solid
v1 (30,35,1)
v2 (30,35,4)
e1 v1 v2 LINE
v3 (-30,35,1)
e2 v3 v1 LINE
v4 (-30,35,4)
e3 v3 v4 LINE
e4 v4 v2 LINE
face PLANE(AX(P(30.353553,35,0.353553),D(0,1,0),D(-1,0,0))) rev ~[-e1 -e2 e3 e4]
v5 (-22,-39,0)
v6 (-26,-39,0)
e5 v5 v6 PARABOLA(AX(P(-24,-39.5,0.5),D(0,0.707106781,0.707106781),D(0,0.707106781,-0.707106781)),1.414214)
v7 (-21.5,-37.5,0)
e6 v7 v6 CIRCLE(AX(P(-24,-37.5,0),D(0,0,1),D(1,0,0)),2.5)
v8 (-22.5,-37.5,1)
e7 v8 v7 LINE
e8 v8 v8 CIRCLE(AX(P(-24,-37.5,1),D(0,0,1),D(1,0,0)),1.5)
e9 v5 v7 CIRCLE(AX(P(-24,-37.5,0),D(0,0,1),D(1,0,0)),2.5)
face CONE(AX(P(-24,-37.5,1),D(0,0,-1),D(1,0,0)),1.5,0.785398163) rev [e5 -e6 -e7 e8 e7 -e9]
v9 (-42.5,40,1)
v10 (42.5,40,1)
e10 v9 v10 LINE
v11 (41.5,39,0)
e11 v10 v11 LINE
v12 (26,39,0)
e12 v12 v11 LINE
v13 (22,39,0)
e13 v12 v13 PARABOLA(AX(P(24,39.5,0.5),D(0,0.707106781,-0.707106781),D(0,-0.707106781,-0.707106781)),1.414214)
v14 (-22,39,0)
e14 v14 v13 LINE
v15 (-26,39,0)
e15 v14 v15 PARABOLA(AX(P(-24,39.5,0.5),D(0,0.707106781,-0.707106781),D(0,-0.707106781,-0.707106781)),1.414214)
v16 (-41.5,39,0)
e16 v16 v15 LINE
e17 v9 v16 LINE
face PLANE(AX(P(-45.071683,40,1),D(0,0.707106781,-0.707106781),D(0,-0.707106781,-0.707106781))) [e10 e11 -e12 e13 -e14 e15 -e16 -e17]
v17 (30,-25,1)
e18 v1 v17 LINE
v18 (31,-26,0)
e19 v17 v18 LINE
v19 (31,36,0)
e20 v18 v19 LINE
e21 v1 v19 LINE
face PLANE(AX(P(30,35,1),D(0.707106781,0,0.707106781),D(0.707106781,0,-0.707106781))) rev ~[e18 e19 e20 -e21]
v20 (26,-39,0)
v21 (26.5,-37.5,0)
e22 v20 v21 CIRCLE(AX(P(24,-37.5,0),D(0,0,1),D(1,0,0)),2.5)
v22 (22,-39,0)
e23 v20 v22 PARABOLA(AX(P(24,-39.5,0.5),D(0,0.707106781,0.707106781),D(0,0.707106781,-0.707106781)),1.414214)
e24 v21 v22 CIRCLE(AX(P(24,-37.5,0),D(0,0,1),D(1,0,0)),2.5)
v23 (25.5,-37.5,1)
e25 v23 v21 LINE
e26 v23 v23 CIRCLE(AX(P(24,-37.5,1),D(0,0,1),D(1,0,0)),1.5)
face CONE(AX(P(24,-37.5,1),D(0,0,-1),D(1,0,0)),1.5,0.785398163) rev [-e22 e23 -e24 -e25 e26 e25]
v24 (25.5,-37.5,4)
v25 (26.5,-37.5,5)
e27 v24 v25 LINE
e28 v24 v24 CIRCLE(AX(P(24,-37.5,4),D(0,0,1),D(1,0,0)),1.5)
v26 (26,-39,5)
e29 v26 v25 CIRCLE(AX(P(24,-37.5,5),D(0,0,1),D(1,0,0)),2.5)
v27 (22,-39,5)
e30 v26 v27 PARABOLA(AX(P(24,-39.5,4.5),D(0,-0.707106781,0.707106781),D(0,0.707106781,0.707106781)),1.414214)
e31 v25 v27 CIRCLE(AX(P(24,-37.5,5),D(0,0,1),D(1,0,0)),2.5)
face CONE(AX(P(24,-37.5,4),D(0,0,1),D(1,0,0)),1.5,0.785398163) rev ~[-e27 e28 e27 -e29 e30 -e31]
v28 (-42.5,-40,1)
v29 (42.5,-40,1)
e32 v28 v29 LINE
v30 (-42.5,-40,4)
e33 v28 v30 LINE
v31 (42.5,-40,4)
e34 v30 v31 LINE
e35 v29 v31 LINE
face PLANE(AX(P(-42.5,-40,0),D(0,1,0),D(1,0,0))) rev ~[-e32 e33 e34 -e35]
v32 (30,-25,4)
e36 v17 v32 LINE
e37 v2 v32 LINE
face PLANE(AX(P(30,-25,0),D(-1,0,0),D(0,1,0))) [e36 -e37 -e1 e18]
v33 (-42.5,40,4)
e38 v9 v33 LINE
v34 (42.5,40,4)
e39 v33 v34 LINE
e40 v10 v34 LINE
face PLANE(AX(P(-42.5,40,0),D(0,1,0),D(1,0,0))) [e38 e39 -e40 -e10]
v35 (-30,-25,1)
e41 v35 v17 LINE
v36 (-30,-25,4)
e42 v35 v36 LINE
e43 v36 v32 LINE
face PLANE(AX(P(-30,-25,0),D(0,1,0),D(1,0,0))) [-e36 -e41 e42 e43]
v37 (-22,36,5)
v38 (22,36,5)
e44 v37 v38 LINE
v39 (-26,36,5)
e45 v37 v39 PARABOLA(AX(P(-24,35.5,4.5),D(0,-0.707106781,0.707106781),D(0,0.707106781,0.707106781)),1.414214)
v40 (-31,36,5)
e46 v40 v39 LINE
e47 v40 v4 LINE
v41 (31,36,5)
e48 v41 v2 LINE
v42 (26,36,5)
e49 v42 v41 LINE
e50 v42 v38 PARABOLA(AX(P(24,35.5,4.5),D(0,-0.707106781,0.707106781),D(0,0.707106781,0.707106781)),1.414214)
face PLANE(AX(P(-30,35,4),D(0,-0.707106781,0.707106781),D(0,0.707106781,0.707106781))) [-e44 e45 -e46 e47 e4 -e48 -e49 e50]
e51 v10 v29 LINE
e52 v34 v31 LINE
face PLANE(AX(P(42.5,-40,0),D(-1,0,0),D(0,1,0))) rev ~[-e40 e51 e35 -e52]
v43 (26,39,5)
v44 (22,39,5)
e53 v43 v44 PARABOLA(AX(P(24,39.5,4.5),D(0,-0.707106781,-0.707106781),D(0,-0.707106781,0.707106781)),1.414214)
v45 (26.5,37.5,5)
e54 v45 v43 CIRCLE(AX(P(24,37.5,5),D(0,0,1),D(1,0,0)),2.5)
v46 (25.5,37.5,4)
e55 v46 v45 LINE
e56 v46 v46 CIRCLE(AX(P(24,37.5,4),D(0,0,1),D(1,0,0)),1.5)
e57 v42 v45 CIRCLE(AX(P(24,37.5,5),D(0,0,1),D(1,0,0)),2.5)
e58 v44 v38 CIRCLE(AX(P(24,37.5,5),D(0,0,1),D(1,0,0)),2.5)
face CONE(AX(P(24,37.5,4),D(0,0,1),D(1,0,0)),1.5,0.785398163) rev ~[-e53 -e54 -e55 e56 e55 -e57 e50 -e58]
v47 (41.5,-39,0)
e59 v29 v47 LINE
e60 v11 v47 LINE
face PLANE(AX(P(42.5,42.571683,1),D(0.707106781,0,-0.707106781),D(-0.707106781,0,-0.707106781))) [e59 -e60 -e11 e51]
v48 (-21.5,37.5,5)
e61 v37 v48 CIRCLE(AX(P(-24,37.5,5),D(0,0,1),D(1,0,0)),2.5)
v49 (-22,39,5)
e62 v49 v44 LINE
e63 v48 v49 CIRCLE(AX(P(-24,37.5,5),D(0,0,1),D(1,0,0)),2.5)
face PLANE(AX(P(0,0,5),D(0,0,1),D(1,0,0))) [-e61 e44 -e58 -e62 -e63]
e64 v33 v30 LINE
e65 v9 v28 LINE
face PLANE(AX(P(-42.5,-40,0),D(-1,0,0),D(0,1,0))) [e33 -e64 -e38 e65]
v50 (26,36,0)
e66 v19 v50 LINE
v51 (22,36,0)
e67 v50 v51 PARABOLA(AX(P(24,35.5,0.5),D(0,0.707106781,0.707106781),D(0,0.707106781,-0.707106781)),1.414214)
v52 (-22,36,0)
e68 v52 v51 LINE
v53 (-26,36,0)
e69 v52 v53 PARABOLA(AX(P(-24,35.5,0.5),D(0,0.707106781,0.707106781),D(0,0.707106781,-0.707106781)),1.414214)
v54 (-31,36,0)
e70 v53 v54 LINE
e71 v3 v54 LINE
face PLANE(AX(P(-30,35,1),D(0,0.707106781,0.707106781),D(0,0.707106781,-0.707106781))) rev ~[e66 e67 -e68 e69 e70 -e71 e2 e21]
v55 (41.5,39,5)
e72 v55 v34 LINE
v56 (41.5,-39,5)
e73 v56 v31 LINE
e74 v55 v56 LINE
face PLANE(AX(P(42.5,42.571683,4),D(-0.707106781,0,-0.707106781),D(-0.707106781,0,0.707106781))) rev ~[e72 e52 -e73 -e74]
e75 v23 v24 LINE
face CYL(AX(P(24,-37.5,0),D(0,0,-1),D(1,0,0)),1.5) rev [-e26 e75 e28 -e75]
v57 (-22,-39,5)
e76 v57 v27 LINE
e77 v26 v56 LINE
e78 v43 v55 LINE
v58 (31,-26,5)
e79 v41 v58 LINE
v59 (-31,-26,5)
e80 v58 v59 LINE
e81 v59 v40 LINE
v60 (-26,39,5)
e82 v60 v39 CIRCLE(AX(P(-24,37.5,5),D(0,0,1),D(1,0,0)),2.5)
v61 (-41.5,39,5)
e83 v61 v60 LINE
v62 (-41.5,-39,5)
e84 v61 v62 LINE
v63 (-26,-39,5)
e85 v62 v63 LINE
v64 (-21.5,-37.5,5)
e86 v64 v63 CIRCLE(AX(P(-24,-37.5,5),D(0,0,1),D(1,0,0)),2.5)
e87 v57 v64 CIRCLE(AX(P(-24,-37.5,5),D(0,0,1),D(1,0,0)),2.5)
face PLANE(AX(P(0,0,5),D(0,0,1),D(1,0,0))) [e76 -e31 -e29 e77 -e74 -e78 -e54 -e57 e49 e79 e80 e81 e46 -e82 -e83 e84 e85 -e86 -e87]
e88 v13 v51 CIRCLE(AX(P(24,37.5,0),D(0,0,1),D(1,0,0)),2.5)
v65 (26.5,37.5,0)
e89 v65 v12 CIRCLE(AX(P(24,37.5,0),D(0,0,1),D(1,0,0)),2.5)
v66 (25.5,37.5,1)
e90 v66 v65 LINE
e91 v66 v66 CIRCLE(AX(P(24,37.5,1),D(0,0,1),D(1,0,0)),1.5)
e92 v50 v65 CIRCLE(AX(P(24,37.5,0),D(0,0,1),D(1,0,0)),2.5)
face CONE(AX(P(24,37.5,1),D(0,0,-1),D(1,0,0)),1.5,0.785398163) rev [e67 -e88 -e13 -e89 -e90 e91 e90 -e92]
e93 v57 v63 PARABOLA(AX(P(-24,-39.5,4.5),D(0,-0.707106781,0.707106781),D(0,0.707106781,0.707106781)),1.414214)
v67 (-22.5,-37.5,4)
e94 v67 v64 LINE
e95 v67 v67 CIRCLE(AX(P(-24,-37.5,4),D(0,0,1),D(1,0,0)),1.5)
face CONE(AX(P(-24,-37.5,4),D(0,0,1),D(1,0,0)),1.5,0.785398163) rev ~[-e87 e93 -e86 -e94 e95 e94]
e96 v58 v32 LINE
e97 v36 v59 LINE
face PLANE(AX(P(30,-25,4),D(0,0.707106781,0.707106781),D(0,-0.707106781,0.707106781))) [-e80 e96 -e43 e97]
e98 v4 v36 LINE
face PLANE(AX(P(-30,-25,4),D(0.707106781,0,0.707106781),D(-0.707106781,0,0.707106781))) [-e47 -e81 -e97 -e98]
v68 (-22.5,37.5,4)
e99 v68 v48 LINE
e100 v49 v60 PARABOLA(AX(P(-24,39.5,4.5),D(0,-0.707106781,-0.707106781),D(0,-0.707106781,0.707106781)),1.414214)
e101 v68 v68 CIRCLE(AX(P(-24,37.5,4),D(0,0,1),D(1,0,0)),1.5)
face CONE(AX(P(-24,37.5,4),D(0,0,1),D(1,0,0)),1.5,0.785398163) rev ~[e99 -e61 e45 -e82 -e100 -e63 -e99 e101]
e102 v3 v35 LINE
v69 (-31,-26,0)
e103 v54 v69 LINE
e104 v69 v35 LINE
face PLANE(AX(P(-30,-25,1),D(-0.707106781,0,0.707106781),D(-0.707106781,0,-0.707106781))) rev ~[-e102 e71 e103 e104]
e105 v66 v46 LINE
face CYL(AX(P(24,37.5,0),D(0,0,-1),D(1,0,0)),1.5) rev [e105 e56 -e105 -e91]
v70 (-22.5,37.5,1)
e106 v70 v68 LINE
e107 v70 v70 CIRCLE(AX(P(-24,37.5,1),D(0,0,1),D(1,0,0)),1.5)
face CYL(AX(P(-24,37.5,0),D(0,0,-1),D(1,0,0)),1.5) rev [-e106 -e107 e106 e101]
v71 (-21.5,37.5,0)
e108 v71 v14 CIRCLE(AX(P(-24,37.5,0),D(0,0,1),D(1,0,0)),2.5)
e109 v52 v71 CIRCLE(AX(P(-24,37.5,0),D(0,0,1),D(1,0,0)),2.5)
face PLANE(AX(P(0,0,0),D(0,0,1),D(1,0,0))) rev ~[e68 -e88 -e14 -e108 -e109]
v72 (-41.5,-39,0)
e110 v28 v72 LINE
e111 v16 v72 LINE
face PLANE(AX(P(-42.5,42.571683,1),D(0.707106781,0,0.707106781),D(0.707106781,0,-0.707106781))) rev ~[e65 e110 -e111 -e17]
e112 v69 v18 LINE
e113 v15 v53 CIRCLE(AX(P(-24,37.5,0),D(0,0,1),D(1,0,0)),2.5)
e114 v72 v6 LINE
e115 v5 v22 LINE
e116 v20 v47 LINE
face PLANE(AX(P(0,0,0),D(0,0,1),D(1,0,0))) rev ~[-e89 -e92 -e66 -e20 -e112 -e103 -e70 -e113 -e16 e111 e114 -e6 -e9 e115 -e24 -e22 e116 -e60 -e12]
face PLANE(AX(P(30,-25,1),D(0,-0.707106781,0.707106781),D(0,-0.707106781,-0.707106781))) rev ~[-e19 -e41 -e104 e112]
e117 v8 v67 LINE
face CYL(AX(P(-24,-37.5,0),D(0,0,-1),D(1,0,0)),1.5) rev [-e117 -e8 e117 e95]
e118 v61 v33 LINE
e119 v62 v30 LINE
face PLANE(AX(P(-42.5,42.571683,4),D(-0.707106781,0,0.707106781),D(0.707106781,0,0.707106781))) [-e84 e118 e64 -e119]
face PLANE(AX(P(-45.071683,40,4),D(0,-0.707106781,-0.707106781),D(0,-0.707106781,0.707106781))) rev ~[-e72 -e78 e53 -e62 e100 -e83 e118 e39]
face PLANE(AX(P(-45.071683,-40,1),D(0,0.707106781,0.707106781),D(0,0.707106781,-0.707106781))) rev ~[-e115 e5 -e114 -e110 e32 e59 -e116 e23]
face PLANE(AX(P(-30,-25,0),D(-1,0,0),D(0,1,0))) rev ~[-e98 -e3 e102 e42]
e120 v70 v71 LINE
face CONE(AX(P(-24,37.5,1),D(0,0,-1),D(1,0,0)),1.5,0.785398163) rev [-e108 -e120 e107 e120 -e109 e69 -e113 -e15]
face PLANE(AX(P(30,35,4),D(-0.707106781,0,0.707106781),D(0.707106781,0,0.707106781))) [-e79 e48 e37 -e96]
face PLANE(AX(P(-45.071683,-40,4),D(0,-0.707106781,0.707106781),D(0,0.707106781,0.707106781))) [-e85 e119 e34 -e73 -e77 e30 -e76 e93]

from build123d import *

# Parameters (mm, degrees)
F0_W          = 85
F0_H          = 80
F0_R          = 1.5
F0_W_2        = 60
F0_H_2        = 60
F1_DEPTH      = 5
F2_T1_DEPTH   = 90.1433659759
F2_T3_DEPTH   = 85.1433659759
F2_T5_DEPTH   = 60
F2_T7_DEPTH   = 60
F2_T29_DEPTH  = 62.571682988
F2_T33_DEPTH  = 62.571682988
F2_T40_DEPTH  = 62.571682988
F2_T44_DEPTH  = 62.571682988
F2_T51_DEPTH  = 62.571682988
F2_T55_DEPTH  = 62.571682988
F2_T62_DEPTH  = 62.571682988
F2_T66_DEPTH  = 62.571682988
F2_T73_DEPTH  = 62.571682988
F2_T77_DEPTH  = 62.571682988
F2_T84_DEPTH  = 62.571682988
F2_T88_DEPTH  = 62.571682988
F2_T95_DEPTH  = 62.571682988
F2_T99_DEPTH  = 62.571682988
F2_T106_DEPTH = 62.571682988
F2_T110_DEPTH = 62.571682988


# Not quite as in the source:
# - a fillet or chamfer that OpenCascade refuses, or shapes differently, is made with other operations: its cross-section is extruded or revolved along the edge and cut away or added


with BuildPart() as f1:
    # F0 (on Top) → F1 (new body)
    with BuildSketch(Plane.XY):
        Rectangle(F0_W, F0_H)
        with Locations((-24, -37.5)):
            Circle(F0_R, mode=Mode.SUBTRACT)
        with Locations((24, -37.5)):
            Circle(F0_R, mode=Mode.SUBTRACT)
        with Locations((-24, 37.5)):
            Circle(F0_R, mode=Mode.SUBTRACT)
        with Locations((0, 5)):
            Rectangle(F0_W_2, F0_H_2, mode=Mode.SUBTRACT)
        with Locations((24, 37.5)):
            Circle(F0_R, mode=Mode.SUBTRACT)
    extrude(amount=F1_DEPTH)

    # F2: chamfer of 1 on 24 edges, made by hand

    # F2_s2 → F2_t1 (cut)
    with BuildSketch(Plane.YZ.offset(-45.071682988)):
        Polygon((40, 4), (39, 5), (40, 5), align=None)
        Polygon((-40, 4), (-39, 5), (-40, 5), align=None)
        Polygon((40, 1), (39, 0), (40, 0), align=None)
        Polygon((-40, 1), (-39, 0), (-40, 0), align=None)
    extrude(amount=F2_T1_DEPTH, mode=Mode.SUBTRACT)

    # F2_s4 → F2_t3 (cut)
    with BuildSketch(Plane.XZ.offset(-42.571682988)):
        Polygon((-42.5, 4), (-41.5, 5), (-42.5, 5), align=None)
        Polygon((42.5, 4), (41.5, 5), (42.5, 5), align=None)
        Polygon((-42.5, 1), (-41.5, 0), (-42.5, 0), align=None)
        Polygon((42.5, 1), (41.5, 0), (42.5, 0), align=None)
    extrude(amount=F2_T3_DEPTH, mode=Mode.SUBTRACT)

    # F2_s6 → F2_t5 (cut)
    with BuildSketch(Plane.XZ.offset(-35)):
        Polygon((-30, 4), (-31, 5), (-30, 5), align=None)
        Polygon((30, 4), (31, 5), (30, 5), align=None)
        Polygon((-30, 1), (-31, 0), (-30, 0), align=None)
        Polygon((30, 1), (31, 0), (30, 0), align=None)
    extrude(amount=F2_T5_DEPTH, mode=Mode.SUBTRACT)

    # F2_s8 → F2_t7 (cut)
    with BuildSketch(Plane.YZ.offset(-30)):
        Polygon((35, 4), (36, 5), (35, 5), align=None)
        Polygon((-25, 4), (-26, 5), (-25, 5), align=None)
        Polygon((35, 1), (36, 0), (35, 0), align=None)
        Polygon((-25, 1), (-26, 0), (-25, 0), align=None)
    extrude(amount=F2_T7_DEPTH, mode=Mode.SUBTRACT)

    # F2_s9 → F2_t10 (revolve, cut)
    with BuildSketch(Plane.XZ.offset(37.5)):
        Polygon((-22.5, 4), (-21.5, 5), (-22.5, 5), align=None)
    revolve(axis=Axis((-24, -37.5, 5), (0, 0, 1)), mode=Mode.SUBTRACT)

    # F2_s11 → F2_t12 (revolve, cut)
    with BuildSketch(Plane.XZ.offset(37.5)):
        Polygon((25.5, 4), (26.5, 5), (25.5, 5), align=None)
    revolve(axis=Axis((24, -37.5, 5), (0, 0, 1)), mode=Mode.SUBTRACT)

    # F2_s13 → F2_t14 (revolve, cut)
    with BuildSketch(Plane.XZ.offset(-37.5)):
        Polygon((-22.5, 4), (-21.5, 5), (-22.5, 5), align=None)
    revolve(axis=Axis((-24, 37.5, 5), (0, 0, 1)), mode=Mode.SUBTRACT)

    # F2_s15 → F2_t16 (revolve, cut)
    with BuildSketch(Plane.XZ.offset(-37.5)):
        Polygon((25.5, 4), (26.5, 5), (25.5, 5), align=None)
    revolve(axis=Axis((24, 37.5, 5), (0, 0, 1)), mode=Mode.SUBTRACT)

    # F2_s17 → F2_t18 (revolve, cut)
    with BuildSketch(Plane.XZ.offset(37.5)):
        Polygon((-22.5, 1), (-21.5, 0), (-22.5, 0), align=None)
    revolve(axis=Axis((-24, -37.5, 0), (0, 0, 1)), mode=Mode.SUBTRACT)

    # F2_s19 → F2_t20 (revolve, cut)
    with BuildSketch(Plane.XZ.offset(37.5)):
        Polygon((25.5, 1), (26.5, 0), (25.5, 0), align=None)
    revolve(axis=Axis((24, -37.5, 0), (0, 0, 1)), mode=Mode.SUBTRACT)

    # F2_s21 → F2_t22 (revolve, cut)
    with BuildSketch(Plane.XZ.offset(-37.5)):
        Polygon((-22.5, 1), (-21.5, 0), (-22.5, 0), align=None)
    revolve(axis=Axis((-24, 37.5, 0), (0, 0, 1)), mode=Mode.SUBTRACT)

    # F2_s23 → F2_t24 (revolve, cut)
    with BuildSketch(Plane.XZ.offset(-37.5)):
        Polygon((25.5, 1), (26.5, 0), (25.5, 0), align=None)
    revolve(axis=Axis((24, 37.5, 0), (0, 0, 1)), mode=Mode.SUBTRACT)


with BuildPart() as f2_tool27:
    # F2_s28 → F2_t29 (new body)
    with BuildSketch(Plane.XZ.offset(27.571682988)):
        Polygon((-30, 4), (-31, 5), (-30, 5), align=None)
    extrude(amount=-F2_T29_DEPTH)

    split(bisect_by=Plane.XZ.offset(25), keep=Keep.TOP)


with BuildPart() as f2_tool31:
    # F2_s32 → F2_t33 (new body)
    with BuildSketch(Plane.YZ.offset(30)):
        Polygon((-25, 4), (-26, 5), (-25, 5), align=None)
    extrude(amount=-F2_T33_DEPTH)

    split(bisect_by=Plane.YZ.offset(-30), keep=Keep.BOTTOM)


with BuildPart() as f2_tool27_1:
    add(f2_tool27.part)

    # F2_t35: intersect F2_tool31
    add(f2_tool31.part, mode=Mode.INTERSECT)


with BuildPart() as f1_1:
    add(f1.part)

    # F2_t25: cut F2_tool27
    add(f2_tool27_1.part, mode=Mode.SUBTRACT)


with BuildPart() as f2_tool38:
    # F2_s39 → F2_t40 (new body)
    with BuildSketch(Plane.XZ.offset(25)):
        Polygon((-30, 4), (-31, 5), (-30, 5), align=None)
    extrude(amount=-F2_T40_DEPTH)

    split(bisect_by=Plane.XZ.offset(-35), keep=Keep.BOTTOM)


with BuildPart() as f2_tool42:
    # F2_s43 → F2_t44 (new body)
    with BuildSketch(Plane.YZ.offset(-32.571682988)):
        Polygon((35, 4), (36, 5), (35, 5), align=None)
    extrude(amount=F2_T44_DEPTH)

    split(bisect_by=Plane.YZ.offset(-30), keep=Keep.BOTTOM)


with BuildPart() as f2_tool38_1:
    add(f2_tool38.part)

    # F2_t46: intersect F2_tool42
    add(f2_tool42.part, mode=Mode.INTERSECT)


with BuildPart() as f1_2:
    add(f1_1.part)

    # F2_t36: cut F2_tool38
    add(f2_tool38_1.part, mode=Mode.SUBTRACT)


with BuildPart() as f2_tool49:
    # F2_s50 → F2_t51 (new body)
    with BuildSketch(Plane.YZ.offset(-30)):
        Polygon((35, 4), (36, 5), (35, 5), align=None)
    extrude(amount=F2_T51_DEPTH)

    split(bisect_by=Plane.YZ.offset(30), keep=Keep.TOP)


with BuildPart() as f2_tool53:
    # F2_s54 → F2_t55 (new body)
    with BuildSketch(Plane.XZ.offset(-37.571682988)):
        Polygon((30, 4), (31, 5), (30, 5), align=None)
    extrude(amount=F2_T55_DEPTH)

    split(bisect_by=Plane.XZ.offset(-35), keep=Keep.BOTTOM)


with BuildPart() as f2_tool49_1:
    add(f2_tool49.part)

    # F2_t57: intersect F2_tool53
    add(f2_tool53.part, mode=Mode.INTERSECT)


with BuildPart() as f1_3:
    add(f1_2.part)

    # F2_t47: cut F2_tool49
    add(f2_tool49_1.part, mode=Mode.SUBTRACT)


with BuildPart() as f2_tool60:
    # F2_s61 → F2_t62 (new body)
    with BuildSketch(Plane.XZ.offset(-35)):
        Polygon((30, 4), (31, 5), (30, 5), align=None)
    extrude(amount=F2_T62_DEPTH)

    split(bisect_by=Plane.XZ.offset(25), keep=Keep.TOP)


with BuildPart() as f2_tool64:
    # F2_s65 → F2_t66 (new body)
    with BuildSketch(Plane.YZ.offset(32.571682988)):
        Polygon((-25, 4), (-26, 5), (-25, 5), align=None)
    extrude(amount=-F2_T66_DEPTH)

    split(bisect_by=Plane.YZ.offset(30), keep=Keep.TOP)


with BuildPart() as f2_tool60_1:
    add(f2_tool60.part)

    # F2_t68: intersect F2_tool64
    add(f2_tool64.part, mode=Mode.INTERSECT)


with BuildPart() as f1_4:
    add(f1_3.part)

    # F2_t58: cut F2_tool60
    add(f2_tool60_1.part, mode=Mode.SUBTRACT)


with BuildPart() as f2_tool71:
    # F2_s72 → F2_t73 (new body)
    with BuildSketch(Plane.XZ.offset(27.571682988)):
        Polygon((-30, 1), (-31, 0), (-30, 0), align=None)
    extrude(amount=-F2_T73_DEPTH)

    split(bisect_by=Plane.XZ.offset(25), keep=Keep.TOP)


with BuildPart() as f2_tool75:
    # F2_s76 → F2_t77 (new body)
    with BuildSketch(Plane.YZ.offset(30)):
        Polygon((-25, 1), (-26, 0), (-25, 0), align=None)
    extrude(amount=-F2_T77_DEPTH)

    split(bisect_by=Plane.YZ.offset(-30), keep=Keep.BOTTOM)


with BuildPart() as f2_tool71_1:
    add(f2_tool71.part)

    # F2_t79: intersect F2_tool75
    add(f2_tool75.part, mode=Mode.INTERSECT)


with BuildPart() as f1_5:
    add(f1_4.part)

    # F2_t69: cut F2_tool71
    add(f2_tool71_1.part, mode=Mode.SUBTRACT)


with BuildPart() as f2_tool82:
    # F2_s83 → F2_t84 (new body)
    with BuildSketch(Plane.XZ.offset(25)):
        Polygon((-30, 1), (-31, 0), (-30, 0), align=None)
    extrude(amount=-F2_T84_DEPTH)

    split(bisect_by=Plane.XZ.offset(-35), keep=Keep.BOTTOM)


with BuildPart() as f2_tool86:
    # F2_s87 → F2_t88 (new body)
    with BuildSketch(Plane.YZ.offset(-32.571682988)):
        Polygon((35, 1), (36, 0), (35, 0), align=None)
    extrude(amount=F2_T88_DEPTH)

    split(bisect_by=Plane.YZ.offset(-30), keep=Keep.BOTTOM)


with BuildPart() as f2_tool82_1:
    add(f2_tool82.part)

    # F2_t90: intersect F2_tool86
    add(f2_tool86.part, mode=Mode.INTERSECT)


with BuildPart() as f1_6:
    add(f1_5.part)

    # F2_t80: cut F2_tool82
    add(f2_tool82_1.part, mode=Mode.SUBTRACT)


with BuildPart() as f2_tool93:
    # F2_s94 → F2_t95 (new body)
    with BuildSketch(Plane.YZ.offset(-30)):
        Polygon((35, 1), (36, 0), (35, 0), align=None)
    extrude(amount=F2_T95_DEPTH)

    split(bisect_by=Plane.YZ.offset(30), keep=Keep.TOP)


with BuildPart() as f2_tool97:
    # F2_s98 → F2_t99 (new body)
    with BuildSketch(Plane.XZ.offset(-37.571682988)):
        Polygon((30, 1), (31, 0), (30, 0), align=None)
    extrude(amount=F2_T99_DEPTH)

    split(bisect_by=Plane.XZ.offset(-35), keep=Keep.BOTTOM)


with BuildPart() as f2_tool93_1:
    add(f2_tool93.part)

    # F2_t101: intersect F2_tool97
    add(f2_tool97.part, mode=Mode.INTERSECT)


with BuildPart() as f1_7:
    add(f1_6.part)

    # F2_t91: cut F2_tool93
    add(f2_tool93_1.part, mode=Mode.SUBTRACT)


with BuildPart() as f2_tool104:
    # F2_s105 → F2_t106 (new body)
    with BuildSketch(Plane.XZ.offset(-35)):
        Polygon((30, 1), (31, 0), (30, 0), align=None)
    extrude(amount=F2_T106_DEPTH)

    split(bisect_by=Plane.XZ.offset(25), keep=Keep.TOP)


with BuildPart() as f2_tool108:
    # F2_s109 → F2_t110 (new body)
    with BuildSketch(Plane.YZ.offset(32.571682988)):
        Polygon((-25, 1), (-26, 0), (-25, 0), align=None)
    extrude(amount=-F2_T110_DEPTH)

    split(bisect_by=Plane.YZ.offset(30), keep=Keep.TOP)


with BuildPart() as f2_tool104_1:
    add(f2_tool104.part)

    # F2_t112: intersect F2_tool108
    add(f2_tool108.part, mode=Mode.INTERSECT)


with BuildPart() as f1_8:
    add(f1_7.part)

    # F2_t102: cut F2_tool104
    add(f2_tool104_1.part, mode=Mode.SUBTRACT)


solid = f1_8.part
